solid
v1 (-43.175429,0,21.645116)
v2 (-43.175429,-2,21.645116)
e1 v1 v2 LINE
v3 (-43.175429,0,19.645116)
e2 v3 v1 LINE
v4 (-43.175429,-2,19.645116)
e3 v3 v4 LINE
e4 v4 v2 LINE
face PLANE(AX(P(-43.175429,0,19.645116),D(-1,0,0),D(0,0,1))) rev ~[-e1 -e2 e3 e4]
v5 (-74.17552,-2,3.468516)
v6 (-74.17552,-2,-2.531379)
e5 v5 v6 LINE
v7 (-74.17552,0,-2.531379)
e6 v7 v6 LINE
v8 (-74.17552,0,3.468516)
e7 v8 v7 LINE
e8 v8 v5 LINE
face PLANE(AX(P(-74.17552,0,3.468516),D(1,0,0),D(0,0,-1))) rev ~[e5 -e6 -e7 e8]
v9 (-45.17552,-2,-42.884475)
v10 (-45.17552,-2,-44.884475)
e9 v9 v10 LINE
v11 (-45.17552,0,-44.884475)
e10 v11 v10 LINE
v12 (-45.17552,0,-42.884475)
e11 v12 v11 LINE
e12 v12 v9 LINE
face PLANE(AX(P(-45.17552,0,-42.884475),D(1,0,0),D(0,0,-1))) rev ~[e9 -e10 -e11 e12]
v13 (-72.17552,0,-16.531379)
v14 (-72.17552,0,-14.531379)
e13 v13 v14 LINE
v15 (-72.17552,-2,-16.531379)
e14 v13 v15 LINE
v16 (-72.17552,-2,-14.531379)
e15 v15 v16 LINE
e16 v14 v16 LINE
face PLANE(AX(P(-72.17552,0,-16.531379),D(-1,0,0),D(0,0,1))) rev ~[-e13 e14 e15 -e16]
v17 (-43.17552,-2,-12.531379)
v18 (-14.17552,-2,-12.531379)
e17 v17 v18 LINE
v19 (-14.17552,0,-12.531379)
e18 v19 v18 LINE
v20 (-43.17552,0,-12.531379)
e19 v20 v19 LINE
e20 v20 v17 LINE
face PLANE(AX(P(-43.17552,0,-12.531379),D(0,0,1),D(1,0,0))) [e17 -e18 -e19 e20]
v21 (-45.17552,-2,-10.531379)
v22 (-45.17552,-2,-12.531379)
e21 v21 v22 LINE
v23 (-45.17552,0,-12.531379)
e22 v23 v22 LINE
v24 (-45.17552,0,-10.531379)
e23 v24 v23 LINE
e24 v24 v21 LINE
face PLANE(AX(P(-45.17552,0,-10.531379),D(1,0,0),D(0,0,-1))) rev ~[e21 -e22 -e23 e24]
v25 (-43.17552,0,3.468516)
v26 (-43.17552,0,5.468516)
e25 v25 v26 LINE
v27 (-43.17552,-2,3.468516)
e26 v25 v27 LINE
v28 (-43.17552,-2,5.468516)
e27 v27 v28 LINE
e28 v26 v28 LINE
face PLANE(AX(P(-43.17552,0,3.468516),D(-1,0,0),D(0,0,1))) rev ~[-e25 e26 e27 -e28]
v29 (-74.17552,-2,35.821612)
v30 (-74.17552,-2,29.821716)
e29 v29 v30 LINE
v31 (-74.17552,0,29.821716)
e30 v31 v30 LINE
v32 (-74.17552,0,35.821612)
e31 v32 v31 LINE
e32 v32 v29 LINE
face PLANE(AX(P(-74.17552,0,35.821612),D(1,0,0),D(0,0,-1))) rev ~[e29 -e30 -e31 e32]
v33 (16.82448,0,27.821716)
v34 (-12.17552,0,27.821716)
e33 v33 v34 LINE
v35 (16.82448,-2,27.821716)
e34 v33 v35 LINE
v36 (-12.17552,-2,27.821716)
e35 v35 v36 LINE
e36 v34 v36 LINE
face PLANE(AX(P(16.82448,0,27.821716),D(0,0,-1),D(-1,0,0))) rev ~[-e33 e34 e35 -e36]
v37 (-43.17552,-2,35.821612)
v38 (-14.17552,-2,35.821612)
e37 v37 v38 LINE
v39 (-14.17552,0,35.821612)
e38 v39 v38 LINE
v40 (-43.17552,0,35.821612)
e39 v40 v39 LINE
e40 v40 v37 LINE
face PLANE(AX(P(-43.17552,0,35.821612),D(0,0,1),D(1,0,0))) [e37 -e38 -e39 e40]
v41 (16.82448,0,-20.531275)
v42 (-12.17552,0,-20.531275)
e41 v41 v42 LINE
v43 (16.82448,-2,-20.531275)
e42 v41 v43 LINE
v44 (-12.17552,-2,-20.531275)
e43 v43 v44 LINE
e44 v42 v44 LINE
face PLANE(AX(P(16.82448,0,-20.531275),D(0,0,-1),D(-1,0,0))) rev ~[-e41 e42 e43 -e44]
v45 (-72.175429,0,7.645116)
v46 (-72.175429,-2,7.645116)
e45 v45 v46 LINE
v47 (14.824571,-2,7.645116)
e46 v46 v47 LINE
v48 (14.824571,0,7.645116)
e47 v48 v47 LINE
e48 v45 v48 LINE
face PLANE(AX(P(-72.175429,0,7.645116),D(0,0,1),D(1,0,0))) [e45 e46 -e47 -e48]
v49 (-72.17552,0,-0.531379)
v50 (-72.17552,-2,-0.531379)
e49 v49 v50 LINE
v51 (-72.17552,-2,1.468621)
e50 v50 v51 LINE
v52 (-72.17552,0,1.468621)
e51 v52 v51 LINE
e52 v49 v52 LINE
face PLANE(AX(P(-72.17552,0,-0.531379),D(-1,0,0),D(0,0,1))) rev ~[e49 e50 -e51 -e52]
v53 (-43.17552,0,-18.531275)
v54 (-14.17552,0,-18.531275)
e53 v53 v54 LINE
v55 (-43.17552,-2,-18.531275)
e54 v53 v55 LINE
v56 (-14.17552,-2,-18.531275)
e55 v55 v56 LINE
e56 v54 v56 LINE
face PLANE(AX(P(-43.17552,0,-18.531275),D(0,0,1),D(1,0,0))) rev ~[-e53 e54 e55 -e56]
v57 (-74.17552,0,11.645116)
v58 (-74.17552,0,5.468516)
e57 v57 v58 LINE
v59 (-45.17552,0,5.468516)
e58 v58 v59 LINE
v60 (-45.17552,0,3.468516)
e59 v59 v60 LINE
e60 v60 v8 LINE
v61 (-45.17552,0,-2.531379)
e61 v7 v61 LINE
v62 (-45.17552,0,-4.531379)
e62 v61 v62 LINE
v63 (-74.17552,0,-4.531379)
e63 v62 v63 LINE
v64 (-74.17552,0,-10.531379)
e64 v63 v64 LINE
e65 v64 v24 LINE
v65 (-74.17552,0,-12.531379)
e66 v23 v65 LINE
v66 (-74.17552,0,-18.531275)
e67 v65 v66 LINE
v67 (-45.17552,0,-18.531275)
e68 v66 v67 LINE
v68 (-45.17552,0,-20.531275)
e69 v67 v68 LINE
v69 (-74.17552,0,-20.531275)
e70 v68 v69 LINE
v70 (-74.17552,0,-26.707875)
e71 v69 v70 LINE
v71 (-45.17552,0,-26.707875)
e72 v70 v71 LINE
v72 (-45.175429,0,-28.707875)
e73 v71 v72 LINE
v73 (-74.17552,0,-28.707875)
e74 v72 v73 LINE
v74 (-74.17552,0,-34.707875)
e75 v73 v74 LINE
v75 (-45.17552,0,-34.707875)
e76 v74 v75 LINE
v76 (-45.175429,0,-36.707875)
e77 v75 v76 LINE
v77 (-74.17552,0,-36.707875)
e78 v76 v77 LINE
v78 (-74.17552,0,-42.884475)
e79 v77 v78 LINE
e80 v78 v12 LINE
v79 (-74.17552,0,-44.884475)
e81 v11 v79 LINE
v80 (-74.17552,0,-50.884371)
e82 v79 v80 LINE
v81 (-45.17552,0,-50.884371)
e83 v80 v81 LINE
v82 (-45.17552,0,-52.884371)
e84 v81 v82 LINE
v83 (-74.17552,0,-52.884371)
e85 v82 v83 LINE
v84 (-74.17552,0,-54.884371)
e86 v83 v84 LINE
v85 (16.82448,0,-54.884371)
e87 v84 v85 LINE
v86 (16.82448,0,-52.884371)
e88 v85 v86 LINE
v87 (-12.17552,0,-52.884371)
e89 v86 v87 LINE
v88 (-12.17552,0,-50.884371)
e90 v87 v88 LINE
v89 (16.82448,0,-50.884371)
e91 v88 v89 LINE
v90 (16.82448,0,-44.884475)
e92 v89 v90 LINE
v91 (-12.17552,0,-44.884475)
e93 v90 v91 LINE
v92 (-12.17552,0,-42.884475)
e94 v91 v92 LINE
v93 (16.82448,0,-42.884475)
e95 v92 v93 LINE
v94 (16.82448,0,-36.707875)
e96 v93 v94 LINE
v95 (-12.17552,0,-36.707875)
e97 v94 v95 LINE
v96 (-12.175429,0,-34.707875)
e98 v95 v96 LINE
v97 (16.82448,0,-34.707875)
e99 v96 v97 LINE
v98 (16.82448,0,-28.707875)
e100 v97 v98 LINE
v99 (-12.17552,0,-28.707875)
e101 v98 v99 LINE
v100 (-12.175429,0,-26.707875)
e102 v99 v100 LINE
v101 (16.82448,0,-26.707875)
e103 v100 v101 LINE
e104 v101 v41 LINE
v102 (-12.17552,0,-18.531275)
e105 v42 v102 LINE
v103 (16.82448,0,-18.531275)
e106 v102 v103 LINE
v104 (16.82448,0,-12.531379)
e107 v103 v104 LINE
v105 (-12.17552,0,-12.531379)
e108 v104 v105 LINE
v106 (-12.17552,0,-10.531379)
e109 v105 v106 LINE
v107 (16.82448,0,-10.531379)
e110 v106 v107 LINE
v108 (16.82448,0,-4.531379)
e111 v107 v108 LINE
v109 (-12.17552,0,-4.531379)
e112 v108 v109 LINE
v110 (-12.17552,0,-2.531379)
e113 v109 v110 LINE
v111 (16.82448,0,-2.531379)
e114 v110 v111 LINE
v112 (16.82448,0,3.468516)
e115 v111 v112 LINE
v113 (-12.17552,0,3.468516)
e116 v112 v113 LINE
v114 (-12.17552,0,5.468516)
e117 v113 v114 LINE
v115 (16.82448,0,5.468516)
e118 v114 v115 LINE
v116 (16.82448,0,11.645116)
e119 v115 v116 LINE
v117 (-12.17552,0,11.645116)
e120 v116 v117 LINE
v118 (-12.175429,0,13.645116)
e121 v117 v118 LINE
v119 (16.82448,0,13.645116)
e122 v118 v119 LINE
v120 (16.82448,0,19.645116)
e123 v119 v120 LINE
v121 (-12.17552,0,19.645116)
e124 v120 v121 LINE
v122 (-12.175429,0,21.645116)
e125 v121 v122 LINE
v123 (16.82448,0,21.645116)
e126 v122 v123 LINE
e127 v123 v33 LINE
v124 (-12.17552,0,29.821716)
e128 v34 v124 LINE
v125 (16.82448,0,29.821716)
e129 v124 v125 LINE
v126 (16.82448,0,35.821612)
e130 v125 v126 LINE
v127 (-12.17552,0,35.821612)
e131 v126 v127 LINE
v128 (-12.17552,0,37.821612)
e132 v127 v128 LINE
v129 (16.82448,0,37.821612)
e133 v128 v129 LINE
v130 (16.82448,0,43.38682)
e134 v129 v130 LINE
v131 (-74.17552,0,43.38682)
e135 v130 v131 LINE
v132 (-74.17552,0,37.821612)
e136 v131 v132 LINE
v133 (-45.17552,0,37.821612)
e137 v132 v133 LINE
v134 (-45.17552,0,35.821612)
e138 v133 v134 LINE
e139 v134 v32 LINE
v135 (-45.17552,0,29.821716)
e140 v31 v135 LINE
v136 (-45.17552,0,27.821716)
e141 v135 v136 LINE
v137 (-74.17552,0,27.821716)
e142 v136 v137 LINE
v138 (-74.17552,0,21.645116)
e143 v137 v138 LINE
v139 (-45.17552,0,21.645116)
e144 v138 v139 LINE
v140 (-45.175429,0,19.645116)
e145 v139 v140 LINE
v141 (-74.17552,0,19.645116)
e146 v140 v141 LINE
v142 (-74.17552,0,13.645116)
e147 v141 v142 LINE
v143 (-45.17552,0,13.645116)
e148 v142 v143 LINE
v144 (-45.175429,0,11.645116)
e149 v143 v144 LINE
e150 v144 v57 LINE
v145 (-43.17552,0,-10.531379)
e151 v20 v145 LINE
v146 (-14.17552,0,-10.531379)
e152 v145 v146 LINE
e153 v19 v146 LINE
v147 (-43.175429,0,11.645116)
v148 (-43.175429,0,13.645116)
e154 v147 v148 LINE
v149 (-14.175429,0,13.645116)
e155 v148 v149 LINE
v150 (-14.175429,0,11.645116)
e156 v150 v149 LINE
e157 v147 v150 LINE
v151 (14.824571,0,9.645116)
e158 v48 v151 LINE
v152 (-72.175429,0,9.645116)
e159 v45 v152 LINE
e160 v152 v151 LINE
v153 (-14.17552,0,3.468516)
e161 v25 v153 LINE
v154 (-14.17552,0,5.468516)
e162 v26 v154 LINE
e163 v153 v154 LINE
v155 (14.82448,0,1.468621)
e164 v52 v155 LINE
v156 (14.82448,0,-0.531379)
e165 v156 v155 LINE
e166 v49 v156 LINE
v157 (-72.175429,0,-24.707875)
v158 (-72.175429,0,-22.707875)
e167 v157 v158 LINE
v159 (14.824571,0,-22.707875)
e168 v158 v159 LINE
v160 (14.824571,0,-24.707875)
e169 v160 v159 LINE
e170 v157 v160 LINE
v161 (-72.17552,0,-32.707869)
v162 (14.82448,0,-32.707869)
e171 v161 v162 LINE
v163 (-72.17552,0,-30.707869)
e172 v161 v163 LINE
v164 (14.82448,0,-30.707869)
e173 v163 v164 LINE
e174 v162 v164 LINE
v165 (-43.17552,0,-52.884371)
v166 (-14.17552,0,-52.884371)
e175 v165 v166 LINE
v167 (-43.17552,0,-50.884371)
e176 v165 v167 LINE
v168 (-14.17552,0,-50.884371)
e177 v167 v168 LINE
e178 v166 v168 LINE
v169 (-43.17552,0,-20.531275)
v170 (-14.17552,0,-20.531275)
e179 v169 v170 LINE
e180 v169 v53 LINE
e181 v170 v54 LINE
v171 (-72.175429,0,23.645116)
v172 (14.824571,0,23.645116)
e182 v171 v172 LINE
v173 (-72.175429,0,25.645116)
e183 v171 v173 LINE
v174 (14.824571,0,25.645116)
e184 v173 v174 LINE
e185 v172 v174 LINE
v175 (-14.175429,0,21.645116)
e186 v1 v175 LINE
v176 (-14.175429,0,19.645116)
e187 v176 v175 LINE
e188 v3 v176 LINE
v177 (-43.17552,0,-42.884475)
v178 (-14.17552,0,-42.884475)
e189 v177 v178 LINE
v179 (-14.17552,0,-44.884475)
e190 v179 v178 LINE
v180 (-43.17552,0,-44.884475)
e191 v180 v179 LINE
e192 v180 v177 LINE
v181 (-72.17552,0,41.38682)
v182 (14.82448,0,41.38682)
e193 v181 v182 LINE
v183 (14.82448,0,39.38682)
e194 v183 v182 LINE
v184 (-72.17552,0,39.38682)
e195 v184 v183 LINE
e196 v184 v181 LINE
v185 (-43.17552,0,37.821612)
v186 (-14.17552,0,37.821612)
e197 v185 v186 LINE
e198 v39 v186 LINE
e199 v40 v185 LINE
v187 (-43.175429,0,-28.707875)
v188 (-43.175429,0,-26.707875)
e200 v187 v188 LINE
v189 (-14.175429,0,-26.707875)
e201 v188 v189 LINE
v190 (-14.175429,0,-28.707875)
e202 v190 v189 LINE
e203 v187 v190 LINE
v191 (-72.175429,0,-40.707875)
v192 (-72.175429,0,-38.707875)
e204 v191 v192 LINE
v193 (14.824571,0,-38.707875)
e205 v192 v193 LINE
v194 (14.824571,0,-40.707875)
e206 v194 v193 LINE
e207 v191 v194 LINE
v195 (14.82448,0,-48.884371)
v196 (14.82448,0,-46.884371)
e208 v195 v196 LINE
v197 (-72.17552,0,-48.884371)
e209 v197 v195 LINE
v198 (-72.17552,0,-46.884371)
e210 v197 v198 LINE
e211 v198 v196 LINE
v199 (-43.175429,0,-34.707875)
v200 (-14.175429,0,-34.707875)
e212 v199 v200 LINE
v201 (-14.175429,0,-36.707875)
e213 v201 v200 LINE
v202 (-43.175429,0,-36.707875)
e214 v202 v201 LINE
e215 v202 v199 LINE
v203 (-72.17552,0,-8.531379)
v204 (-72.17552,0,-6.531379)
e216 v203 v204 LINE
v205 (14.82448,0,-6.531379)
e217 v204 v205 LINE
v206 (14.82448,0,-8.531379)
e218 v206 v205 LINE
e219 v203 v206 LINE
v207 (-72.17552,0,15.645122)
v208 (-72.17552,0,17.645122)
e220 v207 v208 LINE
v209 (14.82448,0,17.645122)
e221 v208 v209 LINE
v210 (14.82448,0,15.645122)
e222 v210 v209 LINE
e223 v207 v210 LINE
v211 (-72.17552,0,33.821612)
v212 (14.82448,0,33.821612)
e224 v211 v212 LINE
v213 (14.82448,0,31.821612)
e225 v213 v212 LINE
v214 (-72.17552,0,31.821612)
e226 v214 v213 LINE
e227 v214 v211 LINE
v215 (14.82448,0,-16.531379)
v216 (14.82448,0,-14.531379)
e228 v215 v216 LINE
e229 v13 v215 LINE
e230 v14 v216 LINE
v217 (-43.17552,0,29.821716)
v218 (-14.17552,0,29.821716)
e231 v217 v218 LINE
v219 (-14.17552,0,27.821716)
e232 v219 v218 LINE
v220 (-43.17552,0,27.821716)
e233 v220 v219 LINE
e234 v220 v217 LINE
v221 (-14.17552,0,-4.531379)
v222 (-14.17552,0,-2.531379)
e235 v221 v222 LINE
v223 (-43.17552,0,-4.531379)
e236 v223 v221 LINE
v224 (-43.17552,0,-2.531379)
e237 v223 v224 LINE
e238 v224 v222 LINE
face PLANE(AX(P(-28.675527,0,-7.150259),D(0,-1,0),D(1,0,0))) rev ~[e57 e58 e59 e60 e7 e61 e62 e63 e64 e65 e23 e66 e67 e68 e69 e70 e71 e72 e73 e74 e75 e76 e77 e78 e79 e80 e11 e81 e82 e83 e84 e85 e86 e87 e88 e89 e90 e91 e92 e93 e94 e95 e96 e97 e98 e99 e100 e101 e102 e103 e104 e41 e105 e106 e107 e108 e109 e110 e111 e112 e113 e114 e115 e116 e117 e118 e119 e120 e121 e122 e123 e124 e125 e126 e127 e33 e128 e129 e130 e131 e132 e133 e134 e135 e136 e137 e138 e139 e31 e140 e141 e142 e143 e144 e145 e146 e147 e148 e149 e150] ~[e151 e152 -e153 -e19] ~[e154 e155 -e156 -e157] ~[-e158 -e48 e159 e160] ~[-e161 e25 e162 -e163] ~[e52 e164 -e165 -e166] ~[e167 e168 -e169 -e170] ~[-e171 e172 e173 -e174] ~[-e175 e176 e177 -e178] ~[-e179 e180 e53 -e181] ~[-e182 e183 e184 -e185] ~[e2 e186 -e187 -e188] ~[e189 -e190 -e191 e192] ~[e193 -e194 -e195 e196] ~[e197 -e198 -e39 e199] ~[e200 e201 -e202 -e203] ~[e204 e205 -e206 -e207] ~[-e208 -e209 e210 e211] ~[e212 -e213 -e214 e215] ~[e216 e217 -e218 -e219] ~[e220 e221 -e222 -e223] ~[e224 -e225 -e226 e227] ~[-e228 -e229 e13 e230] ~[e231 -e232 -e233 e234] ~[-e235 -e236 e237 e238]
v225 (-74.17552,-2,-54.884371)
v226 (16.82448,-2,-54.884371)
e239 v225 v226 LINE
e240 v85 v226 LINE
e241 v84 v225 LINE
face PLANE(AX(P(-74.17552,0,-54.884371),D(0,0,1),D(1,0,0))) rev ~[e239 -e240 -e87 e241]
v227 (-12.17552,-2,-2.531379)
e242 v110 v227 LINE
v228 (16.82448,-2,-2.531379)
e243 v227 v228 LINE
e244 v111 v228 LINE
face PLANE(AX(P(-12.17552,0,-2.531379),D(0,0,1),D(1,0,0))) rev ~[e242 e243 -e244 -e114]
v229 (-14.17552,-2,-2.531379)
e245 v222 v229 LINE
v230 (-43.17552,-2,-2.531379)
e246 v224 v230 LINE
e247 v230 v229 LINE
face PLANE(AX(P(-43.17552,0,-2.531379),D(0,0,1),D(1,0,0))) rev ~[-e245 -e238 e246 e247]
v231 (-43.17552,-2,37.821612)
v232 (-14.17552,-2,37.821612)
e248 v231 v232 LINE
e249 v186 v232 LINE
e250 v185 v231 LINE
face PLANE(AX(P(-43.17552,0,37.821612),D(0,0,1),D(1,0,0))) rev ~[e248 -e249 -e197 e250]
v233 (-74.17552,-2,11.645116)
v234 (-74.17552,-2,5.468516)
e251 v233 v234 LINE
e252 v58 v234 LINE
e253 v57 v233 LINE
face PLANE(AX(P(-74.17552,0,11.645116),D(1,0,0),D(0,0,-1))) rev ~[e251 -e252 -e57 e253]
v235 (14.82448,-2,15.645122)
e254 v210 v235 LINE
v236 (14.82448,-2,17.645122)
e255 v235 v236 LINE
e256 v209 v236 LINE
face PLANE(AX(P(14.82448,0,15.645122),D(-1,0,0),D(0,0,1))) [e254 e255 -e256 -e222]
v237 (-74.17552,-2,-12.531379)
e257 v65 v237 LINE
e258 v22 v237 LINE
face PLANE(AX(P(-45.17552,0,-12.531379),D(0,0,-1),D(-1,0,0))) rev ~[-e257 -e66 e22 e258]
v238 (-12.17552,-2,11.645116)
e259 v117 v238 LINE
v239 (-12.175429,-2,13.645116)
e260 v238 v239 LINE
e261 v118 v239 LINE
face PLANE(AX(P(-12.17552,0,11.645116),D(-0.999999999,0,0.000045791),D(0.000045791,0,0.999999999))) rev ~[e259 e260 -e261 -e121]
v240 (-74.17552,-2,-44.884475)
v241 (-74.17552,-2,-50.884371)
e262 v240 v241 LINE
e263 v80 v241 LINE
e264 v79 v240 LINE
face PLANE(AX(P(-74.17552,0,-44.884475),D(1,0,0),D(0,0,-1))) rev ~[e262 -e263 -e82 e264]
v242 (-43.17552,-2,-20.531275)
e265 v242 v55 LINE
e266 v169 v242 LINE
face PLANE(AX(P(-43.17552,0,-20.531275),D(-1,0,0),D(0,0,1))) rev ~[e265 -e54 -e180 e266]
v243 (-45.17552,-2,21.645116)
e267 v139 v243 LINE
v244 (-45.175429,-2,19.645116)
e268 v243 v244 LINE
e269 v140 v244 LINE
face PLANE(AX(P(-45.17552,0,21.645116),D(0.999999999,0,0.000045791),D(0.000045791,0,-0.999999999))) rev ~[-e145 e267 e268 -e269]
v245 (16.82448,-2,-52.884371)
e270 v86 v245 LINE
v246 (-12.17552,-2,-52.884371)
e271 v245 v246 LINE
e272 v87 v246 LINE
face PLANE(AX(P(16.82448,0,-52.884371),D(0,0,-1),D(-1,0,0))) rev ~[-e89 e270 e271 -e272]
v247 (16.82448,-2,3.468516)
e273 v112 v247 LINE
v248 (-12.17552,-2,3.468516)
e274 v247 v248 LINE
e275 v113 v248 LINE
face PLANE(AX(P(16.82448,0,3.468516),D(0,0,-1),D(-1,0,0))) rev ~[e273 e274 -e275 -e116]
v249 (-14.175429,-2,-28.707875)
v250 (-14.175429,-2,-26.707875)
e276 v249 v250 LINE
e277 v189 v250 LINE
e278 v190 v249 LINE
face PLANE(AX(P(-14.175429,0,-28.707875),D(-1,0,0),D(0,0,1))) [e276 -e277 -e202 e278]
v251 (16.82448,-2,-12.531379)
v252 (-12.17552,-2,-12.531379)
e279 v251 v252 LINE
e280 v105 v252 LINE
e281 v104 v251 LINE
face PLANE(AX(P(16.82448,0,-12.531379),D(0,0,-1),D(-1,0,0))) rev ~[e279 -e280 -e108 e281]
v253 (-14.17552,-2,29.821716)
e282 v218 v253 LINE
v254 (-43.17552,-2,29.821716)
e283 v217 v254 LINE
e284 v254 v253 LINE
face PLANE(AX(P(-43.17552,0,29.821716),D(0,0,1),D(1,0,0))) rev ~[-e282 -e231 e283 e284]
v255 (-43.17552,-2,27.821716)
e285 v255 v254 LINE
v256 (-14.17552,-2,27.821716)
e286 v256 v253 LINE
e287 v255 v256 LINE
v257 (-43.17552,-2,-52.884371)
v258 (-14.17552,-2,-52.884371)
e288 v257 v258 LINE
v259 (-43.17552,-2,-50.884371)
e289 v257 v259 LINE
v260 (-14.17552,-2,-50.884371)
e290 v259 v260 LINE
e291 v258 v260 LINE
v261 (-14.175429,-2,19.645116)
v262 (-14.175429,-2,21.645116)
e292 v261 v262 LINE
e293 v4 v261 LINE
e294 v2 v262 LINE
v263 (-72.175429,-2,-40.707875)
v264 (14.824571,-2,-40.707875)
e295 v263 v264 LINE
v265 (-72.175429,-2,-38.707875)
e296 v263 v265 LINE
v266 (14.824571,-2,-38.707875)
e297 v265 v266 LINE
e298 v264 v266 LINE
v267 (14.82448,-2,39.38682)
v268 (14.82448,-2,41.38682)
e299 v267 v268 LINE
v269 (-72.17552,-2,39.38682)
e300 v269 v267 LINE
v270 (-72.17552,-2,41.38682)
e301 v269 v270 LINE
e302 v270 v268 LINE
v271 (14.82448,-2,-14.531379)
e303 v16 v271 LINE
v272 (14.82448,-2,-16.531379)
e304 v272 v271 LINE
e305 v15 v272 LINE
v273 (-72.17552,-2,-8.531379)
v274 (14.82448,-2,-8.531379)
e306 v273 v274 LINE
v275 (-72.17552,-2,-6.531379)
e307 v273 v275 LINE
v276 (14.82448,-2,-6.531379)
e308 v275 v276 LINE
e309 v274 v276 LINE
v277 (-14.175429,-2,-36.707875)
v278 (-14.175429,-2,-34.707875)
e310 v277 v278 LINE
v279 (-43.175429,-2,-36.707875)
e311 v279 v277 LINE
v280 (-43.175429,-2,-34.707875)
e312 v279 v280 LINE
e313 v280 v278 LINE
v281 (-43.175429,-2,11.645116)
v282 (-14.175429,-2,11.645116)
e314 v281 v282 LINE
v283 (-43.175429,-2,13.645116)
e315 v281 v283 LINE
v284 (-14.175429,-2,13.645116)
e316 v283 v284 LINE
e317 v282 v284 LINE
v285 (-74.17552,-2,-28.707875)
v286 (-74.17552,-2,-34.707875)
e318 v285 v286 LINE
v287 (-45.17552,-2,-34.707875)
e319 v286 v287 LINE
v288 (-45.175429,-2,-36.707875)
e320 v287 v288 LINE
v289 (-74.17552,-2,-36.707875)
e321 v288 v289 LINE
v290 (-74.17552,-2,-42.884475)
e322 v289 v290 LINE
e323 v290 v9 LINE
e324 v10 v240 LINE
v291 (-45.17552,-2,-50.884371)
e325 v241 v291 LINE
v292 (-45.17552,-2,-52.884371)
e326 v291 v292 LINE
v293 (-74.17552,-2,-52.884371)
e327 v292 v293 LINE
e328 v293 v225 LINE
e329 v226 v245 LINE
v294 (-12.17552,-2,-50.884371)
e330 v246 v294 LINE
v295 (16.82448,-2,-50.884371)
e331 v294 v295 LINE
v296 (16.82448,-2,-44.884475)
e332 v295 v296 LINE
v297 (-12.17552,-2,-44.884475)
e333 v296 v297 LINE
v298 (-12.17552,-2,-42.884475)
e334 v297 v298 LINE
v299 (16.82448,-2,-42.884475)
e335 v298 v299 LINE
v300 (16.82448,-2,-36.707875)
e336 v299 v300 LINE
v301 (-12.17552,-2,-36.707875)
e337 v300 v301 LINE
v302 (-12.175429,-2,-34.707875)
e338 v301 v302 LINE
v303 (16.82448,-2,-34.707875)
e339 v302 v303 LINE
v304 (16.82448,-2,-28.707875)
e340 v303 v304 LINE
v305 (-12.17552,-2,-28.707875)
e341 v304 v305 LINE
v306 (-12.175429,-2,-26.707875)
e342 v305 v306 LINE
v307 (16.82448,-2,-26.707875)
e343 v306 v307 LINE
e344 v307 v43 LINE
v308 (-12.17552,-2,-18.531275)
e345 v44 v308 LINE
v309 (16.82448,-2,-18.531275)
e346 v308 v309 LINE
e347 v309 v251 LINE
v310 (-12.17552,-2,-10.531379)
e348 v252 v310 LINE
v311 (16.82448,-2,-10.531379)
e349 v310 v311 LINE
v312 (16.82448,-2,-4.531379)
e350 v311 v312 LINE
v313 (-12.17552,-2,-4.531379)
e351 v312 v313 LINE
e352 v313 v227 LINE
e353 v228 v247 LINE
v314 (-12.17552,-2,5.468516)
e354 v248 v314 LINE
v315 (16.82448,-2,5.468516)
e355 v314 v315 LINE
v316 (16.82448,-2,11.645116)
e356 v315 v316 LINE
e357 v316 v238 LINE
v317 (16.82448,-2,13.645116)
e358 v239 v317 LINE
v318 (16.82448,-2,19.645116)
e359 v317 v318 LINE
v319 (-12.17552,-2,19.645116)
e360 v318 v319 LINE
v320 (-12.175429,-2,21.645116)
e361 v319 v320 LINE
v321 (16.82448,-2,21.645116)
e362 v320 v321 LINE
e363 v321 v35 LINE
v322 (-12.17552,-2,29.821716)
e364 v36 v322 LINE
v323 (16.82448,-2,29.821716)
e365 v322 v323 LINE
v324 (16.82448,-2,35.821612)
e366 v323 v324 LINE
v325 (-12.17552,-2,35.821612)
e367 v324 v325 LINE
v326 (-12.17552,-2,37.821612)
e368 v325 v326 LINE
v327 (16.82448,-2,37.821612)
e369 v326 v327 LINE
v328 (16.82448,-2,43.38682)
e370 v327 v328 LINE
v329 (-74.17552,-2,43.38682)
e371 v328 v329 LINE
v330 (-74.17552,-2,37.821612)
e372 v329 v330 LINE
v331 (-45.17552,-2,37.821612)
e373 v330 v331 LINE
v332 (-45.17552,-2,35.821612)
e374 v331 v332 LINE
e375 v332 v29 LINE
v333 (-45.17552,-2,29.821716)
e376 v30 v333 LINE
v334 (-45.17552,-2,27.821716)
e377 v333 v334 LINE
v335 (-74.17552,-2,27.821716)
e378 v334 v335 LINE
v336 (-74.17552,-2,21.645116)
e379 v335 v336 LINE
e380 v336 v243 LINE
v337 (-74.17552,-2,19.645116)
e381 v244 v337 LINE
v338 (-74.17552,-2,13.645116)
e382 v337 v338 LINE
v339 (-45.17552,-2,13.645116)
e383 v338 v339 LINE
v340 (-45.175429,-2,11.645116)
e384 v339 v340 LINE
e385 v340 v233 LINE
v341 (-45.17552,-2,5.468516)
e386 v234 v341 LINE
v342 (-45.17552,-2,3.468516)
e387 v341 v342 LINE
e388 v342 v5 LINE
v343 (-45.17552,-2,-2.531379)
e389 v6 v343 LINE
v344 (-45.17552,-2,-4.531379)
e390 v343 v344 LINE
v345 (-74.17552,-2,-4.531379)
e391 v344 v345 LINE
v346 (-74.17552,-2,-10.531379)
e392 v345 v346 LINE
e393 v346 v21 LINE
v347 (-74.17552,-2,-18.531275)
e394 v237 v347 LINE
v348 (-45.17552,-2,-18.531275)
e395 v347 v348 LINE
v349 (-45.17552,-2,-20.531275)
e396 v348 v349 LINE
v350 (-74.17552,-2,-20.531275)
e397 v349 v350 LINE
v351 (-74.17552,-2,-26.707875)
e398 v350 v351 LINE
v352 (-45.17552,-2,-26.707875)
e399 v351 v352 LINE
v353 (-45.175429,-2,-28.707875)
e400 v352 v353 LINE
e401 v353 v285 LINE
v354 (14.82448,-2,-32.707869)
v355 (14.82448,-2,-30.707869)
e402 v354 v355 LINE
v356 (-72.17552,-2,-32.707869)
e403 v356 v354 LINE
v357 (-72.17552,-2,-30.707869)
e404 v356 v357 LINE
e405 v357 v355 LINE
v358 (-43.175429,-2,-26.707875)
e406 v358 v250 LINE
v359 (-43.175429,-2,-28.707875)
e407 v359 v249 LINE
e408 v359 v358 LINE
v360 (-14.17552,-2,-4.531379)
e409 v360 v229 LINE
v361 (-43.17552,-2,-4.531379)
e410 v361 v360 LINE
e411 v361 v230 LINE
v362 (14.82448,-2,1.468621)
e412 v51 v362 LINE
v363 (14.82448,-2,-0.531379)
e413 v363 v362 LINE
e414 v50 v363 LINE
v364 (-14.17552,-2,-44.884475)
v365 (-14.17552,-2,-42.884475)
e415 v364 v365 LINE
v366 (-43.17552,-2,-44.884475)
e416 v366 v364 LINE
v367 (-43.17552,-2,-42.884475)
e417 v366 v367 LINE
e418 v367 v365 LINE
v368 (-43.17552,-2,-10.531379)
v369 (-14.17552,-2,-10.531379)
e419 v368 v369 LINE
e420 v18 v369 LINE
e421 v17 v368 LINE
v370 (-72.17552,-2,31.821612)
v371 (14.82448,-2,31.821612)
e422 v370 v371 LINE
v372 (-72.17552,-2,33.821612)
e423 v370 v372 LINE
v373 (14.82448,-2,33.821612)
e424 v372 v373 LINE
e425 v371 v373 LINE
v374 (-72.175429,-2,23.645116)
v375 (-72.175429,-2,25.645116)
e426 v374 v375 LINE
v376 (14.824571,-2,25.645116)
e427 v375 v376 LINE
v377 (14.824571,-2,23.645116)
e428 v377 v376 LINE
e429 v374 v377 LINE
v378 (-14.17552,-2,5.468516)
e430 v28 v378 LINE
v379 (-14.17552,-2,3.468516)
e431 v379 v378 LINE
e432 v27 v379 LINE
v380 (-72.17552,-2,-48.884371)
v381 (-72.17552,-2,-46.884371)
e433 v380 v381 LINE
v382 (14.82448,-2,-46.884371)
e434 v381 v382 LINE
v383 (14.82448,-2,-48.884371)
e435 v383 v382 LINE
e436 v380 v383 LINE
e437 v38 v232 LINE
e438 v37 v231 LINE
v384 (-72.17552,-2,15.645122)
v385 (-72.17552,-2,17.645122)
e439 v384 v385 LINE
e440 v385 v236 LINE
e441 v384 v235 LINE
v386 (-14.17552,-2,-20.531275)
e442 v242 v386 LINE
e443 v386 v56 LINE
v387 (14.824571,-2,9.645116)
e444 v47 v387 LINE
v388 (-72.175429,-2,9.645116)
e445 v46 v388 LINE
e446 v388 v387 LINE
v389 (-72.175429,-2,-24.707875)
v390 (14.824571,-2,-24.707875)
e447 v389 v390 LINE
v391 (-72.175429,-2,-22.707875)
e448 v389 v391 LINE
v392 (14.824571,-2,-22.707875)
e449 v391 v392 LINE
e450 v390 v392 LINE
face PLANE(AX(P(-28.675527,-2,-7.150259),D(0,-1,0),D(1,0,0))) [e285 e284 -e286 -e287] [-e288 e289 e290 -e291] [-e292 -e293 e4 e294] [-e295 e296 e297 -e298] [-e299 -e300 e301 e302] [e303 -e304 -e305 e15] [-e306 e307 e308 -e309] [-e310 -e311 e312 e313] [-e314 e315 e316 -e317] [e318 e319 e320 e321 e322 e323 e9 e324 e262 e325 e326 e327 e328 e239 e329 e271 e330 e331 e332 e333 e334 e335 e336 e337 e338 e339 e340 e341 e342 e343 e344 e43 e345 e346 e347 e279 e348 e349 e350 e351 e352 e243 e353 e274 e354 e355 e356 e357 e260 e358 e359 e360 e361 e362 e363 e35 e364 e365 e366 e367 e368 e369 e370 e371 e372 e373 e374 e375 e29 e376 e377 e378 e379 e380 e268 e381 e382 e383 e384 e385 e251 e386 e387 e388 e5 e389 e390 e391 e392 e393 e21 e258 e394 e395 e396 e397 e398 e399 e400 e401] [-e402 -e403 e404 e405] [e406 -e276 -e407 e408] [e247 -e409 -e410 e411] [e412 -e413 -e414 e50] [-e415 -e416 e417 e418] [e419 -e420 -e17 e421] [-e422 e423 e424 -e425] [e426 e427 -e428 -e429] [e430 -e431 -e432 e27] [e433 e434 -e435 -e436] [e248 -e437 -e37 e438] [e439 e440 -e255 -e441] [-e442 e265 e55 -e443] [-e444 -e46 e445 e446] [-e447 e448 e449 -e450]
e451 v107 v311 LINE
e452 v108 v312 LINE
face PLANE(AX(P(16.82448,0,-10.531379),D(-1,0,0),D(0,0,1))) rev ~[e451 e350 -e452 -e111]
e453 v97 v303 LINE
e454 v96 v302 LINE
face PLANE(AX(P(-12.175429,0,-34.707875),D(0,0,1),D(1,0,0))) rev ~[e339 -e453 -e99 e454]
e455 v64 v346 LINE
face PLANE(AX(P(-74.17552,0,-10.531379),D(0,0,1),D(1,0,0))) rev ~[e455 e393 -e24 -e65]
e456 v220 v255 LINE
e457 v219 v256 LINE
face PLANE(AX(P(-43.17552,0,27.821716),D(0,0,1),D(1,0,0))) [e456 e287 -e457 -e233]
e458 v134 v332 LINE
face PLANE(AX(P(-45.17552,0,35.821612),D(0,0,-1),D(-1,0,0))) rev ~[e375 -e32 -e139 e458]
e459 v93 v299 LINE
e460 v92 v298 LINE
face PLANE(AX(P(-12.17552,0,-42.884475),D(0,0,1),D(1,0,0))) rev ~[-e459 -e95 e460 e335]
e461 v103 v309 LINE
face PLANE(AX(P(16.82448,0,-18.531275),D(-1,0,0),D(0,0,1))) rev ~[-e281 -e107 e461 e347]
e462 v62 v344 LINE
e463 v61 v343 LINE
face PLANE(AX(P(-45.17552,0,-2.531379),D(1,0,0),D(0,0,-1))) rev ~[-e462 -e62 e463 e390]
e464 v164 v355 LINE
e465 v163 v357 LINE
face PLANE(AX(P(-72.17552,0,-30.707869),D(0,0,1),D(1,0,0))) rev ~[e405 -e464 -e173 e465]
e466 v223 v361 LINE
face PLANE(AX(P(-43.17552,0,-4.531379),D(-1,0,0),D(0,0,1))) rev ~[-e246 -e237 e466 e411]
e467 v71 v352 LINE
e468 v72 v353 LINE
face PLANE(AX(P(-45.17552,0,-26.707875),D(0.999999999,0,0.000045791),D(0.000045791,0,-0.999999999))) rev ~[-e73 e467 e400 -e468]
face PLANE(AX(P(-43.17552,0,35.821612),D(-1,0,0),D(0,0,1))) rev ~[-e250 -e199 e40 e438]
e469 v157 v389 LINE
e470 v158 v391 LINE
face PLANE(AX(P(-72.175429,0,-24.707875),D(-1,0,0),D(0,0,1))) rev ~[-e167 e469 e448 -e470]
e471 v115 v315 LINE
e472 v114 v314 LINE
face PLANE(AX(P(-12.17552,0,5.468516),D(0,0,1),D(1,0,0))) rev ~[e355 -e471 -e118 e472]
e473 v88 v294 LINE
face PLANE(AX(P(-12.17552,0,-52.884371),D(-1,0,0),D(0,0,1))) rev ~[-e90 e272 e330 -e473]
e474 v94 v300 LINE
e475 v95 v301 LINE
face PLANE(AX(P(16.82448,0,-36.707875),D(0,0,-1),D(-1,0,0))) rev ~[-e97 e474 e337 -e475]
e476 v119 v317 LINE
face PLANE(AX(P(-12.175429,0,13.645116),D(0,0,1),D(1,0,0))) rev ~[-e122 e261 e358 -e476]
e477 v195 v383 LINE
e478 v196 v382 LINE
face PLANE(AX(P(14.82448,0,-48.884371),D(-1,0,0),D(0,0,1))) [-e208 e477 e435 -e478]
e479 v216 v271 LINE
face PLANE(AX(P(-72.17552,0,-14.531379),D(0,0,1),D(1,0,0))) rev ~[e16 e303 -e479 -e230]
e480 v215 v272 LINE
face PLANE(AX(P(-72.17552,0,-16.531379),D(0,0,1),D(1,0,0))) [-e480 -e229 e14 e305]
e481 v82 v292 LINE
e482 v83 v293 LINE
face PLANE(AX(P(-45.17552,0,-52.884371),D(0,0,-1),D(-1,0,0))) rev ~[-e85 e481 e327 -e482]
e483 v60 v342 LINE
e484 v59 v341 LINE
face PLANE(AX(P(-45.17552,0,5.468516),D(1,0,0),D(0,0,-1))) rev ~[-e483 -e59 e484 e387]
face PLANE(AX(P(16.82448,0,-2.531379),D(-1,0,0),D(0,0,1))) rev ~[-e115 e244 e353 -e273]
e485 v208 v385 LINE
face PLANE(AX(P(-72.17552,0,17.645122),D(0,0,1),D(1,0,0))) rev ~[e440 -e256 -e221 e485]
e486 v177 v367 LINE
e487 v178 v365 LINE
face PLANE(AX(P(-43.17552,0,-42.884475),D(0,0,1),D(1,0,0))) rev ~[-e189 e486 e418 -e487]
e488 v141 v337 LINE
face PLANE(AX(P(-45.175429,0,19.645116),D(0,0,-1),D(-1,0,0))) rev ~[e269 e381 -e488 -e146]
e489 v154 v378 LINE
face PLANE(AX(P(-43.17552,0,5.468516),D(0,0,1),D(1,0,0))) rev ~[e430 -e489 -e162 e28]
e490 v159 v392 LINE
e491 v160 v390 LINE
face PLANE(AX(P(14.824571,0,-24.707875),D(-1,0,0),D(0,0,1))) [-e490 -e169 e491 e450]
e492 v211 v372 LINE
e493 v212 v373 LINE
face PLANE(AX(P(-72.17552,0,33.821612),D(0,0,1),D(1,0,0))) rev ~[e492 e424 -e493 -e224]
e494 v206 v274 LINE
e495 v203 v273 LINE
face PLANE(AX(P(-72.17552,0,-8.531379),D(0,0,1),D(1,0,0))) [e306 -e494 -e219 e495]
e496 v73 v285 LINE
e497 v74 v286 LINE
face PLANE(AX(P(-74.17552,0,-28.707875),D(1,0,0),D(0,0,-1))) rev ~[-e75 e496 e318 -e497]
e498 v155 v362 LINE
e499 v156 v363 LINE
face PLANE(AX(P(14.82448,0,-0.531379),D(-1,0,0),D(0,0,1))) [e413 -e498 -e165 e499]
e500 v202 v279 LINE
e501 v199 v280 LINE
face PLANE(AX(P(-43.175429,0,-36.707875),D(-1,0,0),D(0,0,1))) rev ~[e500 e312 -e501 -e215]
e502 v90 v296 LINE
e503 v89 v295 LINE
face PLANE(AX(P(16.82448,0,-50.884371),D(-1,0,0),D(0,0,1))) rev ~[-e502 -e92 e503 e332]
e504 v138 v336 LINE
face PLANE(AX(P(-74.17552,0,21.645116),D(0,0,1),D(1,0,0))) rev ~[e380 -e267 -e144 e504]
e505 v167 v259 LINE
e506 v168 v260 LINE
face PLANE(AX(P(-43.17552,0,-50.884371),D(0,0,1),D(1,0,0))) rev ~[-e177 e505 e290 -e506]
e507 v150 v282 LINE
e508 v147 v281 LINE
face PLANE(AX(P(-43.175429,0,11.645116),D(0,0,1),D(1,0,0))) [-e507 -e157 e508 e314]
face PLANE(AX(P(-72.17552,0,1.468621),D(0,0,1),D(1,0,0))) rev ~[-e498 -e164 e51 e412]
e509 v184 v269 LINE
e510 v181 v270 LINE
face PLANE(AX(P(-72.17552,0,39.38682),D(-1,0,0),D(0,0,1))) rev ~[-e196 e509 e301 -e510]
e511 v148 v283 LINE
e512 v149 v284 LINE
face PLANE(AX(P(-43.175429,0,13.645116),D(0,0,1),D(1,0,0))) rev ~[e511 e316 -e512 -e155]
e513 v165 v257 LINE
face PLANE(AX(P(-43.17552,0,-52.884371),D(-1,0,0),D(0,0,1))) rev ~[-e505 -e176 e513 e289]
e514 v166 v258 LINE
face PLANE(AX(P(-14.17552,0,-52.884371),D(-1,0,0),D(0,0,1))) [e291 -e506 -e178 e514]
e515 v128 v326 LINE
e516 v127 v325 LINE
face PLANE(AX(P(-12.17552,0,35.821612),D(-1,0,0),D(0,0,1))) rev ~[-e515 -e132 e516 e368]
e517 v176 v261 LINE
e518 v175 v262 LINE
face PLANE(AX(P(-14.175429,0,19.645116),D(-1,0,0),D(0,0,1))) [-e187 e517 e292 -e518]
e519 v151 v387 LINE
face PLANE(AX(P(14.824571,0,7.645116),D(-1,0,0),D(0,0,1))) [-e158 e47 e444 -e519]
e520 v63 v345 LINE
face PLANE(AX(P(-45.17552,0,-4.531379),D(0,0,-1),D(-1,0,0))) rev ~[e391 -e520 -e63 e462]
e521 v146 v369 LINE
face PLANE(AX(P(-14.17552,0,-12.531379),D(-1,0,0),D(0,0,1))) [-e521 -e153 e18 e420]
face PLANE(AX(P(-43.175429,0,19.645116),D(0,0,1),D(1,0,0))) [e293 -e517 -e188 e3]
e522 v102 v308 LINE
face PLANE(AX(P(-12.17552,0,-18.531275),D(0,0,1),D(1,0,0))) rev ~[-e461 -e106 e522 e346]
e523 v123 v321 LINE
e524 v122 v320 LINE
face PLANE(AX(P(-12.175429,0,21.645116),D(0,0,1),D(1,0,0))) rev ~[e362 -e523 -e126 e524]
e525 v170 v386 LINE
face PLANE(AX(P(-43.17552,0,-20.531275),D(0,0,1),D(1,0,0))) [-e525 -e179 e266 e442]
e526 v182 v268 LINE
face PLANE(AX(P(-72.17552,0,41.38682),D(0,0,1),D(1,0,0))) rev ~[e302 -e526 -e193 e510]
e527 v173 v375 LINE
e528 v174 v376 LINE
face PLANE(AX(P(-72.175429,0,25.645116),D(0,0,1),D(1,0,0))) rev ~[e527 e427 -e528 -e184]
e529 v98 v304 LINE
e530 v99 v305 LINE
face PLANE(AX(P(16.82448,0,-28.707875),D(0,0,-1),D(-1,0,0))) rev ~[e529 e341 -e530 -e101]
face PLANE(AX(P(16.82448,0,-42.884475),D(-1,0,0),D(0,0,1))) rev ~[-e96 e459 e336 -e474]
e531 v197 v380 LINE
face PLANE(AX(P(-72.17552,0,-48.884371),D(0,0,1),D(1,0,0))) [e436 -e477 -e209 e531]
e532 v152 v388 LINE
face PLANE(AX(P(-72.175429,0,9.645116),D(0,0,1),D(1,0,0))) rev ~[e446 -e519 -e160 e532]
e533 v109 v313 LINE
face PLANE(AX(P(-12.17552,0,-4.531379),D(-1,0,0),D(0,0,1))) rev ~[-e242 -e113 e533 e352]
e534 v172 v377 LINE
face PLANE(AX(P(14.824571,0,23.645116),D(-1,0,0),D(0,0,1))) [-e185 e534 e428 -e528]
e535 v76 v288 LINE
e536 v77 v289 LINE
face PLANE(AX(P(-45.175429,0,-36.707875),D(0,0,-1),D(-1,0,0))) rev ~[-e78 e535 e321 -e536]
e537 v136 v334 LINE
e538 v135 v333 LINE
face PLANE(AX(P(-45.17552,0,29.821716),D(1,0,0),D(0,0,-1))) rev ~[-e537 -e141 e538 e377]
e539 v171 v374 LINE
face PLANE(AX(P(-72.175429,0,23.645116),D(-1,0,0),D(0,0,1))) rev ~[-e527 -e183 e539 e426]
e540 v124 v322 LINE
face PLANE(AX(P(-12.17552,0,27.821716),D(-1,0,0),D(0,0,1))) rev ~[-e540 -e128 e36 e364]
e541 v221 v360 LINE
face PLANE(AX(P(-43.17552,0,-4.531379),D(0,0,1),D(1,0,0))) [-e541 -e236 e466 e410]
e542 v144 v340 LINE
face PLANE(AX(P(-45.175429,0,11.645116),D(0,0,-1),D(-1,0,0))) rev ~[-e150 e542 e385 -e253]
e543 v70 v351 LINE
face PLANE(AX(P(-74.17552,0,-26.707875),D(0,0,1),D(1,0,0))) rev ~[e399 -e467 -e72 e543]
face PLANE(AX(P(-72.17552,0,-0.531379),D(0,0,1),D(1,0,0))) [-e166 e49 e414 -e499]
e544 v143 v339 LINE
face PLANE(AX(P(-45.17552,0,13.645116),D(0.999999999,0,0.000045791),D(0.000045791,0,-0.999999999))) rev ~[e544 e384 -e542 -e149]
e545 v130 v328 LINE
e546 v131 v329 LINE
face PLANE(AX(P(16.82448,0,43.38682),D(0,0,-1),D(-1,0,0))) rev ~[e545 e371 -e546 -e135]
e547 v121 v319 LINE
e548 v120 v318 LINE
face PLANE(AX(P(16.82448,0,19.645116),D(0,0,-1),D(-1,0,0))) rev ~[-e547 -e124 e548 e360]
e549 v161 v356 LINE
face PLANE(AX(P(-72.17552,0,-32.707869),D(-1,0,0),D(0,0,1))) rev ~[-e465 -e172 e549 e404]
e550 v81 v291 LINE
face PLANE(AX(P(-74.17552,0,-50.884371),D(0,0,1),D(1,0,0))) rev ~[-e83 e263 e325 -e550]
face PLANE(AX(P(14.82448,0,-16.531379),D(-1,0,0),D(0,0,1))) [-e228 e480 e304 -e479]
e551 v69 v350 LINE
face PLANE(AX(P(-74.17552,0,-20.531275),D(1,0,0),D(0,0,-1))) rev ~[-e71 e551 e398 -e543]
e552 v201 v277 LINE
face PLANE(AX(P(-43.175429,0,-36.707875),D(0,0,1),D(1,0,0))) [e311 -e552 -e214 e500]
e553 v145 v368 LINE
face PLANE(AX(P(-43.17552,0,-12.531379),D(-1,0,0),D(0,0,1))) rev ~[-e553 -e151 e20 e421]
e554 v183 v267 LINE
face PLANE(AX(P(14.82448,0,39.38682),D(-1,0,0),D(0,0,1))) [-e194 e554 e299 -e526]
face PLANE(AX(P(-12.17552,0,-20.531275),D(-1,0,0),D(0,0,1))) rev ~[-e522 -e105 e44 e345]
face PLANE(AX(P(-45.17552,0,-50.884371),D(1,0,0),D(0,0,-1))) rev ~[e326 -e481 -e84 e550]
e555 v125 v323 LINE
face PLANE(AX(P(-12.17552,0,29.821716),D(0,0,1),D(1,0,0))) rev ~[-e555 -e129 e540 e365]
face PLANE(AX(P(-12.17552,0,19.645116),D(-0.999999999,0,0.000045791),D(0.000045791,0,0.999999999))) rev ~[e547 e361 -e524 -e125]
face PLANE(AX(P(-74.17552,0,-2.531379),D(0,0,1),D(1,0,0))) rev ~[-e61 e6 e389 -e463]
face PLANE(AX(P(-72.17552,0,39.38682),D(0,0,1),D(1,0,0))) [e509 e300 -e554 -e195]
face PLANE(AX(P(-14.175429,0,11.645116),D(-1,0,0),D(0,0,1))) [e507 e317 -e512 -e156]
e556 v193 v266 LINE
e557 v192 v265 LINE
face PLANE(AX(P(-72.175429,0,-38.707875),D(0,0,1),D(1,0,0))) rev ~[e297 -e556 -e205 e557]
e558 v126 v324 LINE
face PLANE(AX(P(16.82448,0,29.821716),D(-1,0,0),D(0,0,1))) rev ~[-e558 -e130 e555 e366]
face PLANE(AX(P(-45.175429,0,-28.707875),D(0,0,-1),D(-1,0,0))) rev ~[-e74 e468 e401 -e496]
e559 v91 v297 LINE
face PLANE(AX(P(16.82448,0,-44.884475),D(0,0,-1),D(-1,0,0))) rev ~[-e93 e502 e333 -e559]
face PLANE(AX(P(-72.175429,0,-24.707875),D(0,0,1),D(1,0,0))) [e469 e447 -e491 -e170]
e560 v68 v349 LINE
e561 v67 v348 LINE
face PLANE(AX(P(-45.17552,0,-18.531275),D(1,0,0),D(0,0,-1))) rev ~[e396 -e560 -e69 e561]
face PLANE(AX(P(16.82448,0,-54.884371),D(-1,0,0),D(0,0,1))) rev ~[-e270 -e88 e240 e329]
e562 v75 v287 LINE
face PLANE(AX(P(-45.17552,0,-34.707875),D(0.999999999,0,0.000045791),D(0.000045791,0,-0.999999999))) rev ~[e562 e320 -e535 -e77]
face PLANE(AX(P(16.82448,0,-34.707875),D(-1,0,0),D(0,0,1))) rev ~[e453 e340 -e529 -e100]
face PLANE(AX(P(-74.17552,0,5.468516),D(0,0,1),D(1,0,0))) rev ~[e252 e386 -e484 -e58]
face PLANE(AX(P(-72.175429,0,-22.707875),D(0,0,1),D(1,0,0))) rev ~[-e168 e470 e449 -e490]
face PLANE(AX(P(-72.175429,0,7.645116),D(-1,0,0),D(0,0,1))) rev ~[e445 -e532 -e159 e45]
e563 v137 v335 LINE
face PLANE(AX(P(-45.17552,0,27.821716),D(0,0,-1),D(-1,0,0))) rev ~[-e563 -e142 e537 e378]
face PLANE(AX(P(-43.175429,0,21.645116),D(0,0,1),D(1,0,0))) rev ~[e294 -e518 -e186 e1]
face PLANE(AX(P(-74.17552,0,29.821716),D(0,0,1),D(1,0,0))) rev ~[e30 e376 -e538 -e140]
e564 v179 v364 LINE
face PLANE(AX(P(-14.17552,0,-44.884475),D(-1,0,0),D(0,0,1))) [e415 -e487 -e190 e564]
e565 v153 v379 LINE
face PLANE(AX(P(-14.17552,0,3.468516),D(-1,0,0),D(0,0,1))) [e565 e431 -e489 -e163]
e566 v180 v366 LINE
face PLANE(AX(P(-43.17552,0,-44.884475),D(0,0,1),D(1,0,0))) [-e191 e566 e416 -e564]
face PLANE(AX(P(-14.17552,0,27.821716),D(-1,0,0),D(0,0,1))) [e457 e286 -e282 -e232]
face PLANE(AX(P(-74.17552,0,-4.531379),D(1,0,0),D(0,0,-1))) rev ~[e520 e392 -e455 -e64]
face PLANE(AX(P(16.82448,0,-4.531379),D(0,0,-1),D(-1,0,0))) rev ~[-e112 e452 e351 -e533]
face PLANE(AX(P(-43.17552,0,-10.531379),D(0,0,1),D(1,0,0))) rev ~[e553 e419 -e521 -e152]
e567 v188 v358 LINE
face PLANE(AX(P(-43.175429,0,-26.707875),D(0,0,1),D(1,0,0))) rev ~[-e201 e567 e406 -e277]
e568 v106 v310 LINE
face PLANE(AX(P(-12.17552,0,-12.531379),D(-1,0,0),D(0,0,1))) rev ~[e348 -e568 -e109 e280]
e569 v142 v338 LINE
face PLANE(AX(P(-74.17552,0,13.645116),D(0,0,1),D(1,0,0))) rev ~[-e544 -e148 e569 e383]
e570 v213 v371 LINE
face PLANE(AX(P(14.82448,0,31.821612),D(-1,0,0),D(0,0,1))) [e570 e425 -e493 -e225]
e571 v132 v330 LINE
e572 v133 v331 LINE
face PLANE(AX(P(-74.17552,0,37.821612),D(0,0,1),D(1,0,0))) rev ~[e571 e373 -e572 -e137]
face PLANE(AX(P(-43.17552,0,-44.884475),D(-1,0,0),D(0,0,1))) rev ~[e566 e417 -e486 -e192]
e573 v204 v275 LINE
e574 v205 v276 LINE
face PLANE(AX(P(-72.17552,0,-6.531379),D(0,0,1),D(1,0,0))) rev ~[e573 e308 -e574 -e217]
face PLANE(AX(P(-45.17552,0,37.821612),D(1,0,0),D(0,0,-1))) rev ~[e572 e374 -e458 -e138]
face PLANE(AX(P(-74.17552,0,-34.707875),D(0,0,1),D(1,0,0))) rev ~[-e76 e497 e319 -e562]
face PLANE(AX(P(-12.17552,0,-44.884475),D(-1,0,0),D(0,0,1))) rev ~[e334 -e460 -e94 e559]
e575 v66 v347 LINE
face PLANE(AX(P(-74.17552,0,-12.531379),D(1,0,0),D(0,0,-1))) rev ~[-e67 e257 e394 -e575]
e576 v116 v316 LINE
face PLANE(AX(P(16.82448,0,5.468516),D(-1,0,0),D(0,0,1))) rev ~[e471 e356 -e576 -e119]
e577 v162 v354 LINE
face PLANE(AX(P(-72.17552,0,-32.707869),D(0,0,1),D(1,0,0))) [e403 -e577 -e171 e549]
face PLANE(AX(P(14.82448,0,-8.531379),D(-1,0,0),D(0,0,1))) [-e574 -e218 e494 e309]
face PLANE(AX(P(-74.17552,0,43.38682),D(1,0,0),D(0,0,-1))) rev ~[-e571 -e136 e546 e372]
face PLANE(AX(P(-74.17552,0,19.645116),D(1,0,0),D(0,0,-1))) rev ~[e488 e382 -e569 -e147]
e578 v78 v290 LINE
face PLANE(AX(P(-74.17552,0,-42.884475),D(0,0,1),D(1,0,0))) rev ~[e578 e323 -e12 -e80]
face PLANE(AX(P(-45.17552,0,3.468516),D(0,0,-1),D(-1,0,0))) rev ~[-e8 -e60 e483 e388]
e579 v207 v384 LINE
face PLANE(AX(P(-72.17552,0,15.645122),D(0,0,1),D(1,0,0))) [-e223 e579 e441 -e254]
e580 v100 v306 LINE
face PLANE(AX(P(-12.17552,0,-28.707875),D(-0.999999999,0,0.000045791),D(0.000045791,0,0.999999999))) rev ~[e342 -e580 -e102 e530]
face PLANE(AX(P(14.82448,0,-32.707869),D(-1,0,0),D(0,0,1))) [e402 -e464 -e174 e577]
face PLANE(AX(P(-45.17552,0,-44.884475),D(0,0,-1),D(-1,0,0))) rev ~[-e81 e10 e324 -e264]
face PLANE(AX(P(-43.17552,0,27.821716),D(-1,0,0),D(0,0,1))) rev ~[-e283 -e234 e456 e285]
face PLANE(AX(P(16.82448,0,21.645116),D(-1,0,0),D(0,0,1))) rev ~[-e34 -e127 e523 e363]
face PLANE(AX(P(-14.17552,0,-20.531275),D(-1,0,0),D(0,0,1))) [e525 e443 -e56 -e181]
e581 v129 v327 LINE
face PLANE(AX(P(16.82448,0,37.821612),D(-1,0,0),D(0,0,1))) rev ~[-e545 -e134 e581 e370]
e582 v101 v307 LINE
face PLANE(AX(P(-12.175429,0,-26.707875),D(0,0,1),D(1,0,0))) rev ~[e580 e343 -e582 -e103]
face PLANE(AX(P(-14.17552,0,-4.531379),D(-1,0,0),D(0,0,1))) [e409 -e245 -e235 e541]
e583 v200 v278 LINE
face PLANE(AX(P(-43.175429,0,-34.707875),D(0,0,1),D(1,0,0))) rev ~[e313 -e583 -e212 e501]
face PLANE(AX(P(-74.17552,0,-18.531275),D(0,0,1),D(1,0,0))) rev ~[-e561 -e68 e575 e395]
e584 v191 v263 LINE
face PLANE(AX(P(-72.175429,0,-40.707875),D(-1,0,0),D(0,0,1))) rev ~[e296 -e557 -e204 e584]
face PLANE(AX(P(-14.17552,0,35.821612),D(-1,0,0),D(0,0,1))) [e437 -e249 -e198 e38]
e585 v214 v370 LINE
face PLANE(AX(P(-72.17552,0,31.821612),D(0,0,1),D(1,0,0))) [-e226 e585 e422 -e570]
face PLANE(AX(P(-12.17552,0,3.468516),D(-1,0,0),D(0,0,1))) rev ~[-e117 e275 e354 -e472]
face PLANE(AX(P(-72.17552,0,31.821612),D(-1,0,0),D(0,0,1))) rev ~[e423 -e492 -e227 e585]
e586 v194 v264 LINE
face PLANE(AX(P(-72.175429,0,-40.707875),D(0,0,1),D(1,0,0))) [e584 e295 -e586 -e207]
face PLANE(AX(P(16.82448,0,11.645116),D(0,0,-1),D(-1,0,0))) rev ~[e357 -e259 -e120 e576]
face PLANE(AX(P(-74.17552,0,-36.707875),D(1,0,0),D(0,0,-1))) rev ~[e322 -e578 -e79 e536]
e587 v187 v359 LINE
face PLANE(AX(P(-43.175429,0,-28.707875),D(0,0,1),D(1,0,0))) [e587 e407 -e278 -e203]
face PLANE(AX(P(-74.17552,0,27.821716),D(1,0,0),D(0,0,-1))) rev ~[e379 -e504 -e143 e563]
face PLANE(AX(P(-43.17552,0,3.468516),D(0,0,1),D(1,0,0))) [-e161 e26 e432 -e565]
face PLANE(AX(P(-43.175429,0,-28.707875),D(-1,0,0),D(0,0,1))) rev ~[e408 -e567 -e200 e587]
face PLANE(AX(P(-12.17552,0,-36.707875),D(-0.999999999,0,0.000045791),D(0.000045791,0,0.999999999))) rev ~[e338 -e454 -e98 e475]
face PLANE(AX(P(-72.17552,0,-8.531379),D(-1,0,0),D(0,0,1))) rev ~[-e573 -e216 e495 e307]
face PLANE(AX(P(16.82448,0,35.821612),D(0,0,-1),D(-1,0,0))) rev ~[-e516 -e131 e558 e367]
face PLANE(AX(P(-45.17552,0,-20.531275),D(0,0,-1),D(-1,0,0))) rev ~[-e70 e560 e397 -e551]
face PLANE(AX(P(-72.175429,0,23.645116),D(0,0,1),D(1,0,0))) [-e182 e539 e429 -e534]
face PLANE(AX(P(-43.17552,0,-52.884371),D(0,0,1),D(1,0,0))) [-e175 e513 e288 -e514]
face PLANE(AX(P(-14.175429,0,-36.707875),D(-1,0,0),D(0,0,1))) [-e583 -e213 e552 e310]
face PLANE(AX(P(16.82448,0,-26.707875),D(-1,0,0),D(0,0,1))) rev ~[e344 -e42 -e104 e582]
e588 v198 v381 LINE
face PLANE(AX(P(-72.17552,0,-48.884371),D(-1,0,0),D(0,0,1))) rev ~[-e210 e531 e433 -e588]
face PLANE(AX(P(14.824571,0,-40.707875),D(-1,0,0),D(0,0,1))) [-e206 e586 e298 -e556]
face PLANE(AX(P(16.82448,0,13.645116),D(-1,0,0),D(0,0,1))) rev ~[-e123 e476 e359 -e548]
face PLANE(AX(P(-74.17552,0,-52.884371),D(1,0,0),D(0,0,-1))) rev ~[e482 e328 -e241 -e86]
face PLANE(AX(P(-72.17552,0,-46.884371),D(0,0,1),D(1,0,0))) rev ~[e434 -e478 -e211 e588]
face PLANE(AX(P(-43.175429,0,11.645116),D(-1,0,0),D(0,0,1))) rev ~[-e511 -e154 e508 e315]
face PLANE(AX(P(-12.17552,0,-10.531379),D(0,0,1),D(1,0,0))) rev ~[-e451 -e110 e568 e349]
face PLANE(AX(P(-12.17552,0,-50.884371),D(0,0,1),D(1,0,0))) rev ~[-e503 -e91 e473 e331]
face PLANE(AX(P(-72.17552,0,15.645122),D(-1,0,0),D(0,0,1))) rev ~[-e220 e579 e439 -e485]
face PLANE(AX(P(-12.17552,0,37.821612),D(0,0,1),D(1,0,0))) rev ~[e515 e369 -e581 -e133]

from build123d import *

# Parameters (mm, degrees)
F0_W     = 87
F0_H     = 2
F0_W_2   = 29
F1_DEPTH = 2


# Not quite as in the source:
# - ends of sketch curves that miss each other by under 0.0002 mm in the source are joined


with BuildPart() as f1:
    # F0 (on Front) → F1 (new body)
    with BuildSketch(Plane.XZ):
        Polygon((-74.1755201817, -53.7046223087), (-74.1755201817, -54.8843706005), (16.8244798183, -54.8843706005), (16.8244798183, -52.8843706005), (-12.1755201817, -52.8843706005), (-12.1755201817, -50.8843706005), (16.8244798183, -50.8843706005), (16.8244798183, -44.8844749875), (-12.1755201817, -44.8844749875), (-12.1755201817, -42.8844749875), (16.8244798183, -42.8844749875), (16.8244798183, -36.7078750432), (-12.1755201817, -36.7078750432), (-12.1754285991, -34.7078750432), (16.8244798183, -34.7078750432), (16.8244798183, -28.7078750432), (-12.1755201817, -28.7078750432), (-12.1754285991, -26.7078750432), (16.8244798183, -26.7078750432), (16.8244798183, -20.5312750988), (-12.1755201817, -20.5312750988), (-12.1755201817, -18.5312750988), (16.8244798183, -18.5312750988), (16.8244798183, -12.5313794858), (-12.1755201817, -12.5313794858), (-12.1755201817, -10.5313794858), (16.8244798183, -10.5313794858), (16.8244798183, -4.5313794858), (-12.1755201817, -4.5313794858), (-12.1755201817, -2.5313794858), (16.8244798183, -2.5313794858), (16.8244798183, 3.4685161272), (-12.1755201817, 3.4685161272), (-12.1755201817, 5.4685161272), (16.8244798183, 5.4685161272), (16.8244798183, 11.6451160715), (-12.1755201817, 11.6451160715), (-12.1754285991, 13.6451160715), (16.8244798183, 13.6451160715), (16.8244798183, 19.6451160715), (-12.1755201817, 19.6451160715), (-12.1754285991, 21.6451160715), (16.8244798183, 21.6451160715), (16.8244798183, 27.8217160159), (-12.1755201817, 27.8217160159), (-12.1755201817, 29.8217160159), (16.8244798183, 29.8217160159), (16.8244798183, 35.8216116289), (-12.1755201817, 35.8216116289), (-12.1755201817, 37.8216116289), (16.8244798183, 37.8216116289), (16.8244798183, 43.3868200481), (-74.1755201817, 43.3868200481), (-74.1755201817, 37.8216116289), (-45.1755201817, 37.8216116289), (-45.1755201817, 35.8216116289), (-74.1755201817, 35.8216116289), (-74.1755201817, 29.8217160159), (-45.1755201817, 29.8217160159), (-45.1755201817, 27.8217160159), (-74.1755201817, 27.8217160159), (-74.1755201817, 21.6451160715), (-45.1755201817, 21.6451160715), (-45.1754285991, 19.6451160715), (-74.1755201817, 19.6451160715), (-74.1755201817, 13.6451160715), (-45.1755201817, 13.6451160715), (-45.1754285991, 11.6451160715), (-74.1755201817, 11.6451160715), (-74.1755201817, 5.4685161272), (-45.1755201817, 5.4685161272), (-45.1755201817, 3.4685161272), (-74.1755201817, 3.4685161272), (-74.1755201817, -2.5313794858), (-45.1755201817, -2.5313794858), (-45.1755201817, -4.5313794858), (-74.1755201817, -4.5313794858), (-74.1755201817, -10.5313794858), (-45.1755201817, -10.5313794858), (-45.1755201817, -12.5313794858), (-74.1755201817, -12.5313794858), (-74.1755201817, -18.5312750988), (-45.1755201817, -18.5312750988), (-45.1755201817, -20.5312750988), (-74.1755201817, -20.5312750988), (-74.1755201817, -26.7078750432), (-45.1755201817, -26.7078750432), (-45.1754285991, -28.7078750432), (-74.1755201817, -28.7078750432), (-74.1755201817, -34.7078750432), (-45.1755201817, -34.7078750432), (-45.1754285991, -36.7078750432), (-74.1755201817, -36.7078750432), (-74.1755201817, -42.8844749875), (-45.1755201817, -42.8844749875), (-45.1755201817, -44.8844749875), (-74.1755201817, -44.8844749875), (-74.1755201817, -50.8843706005), (-45.1755201817, -50.8843706005), (-45.1755201817, -52.8843706005), (-74.1755201817, -52.8843706005), align=None)
        with Locations((-28.6755201817, -47.8843706005)):
            Rectangle(F0_W, F0_H, mode=Mode.SUBTRACT)
        with Locations((-28.6755201817, -43.8844749875)):
            Rectangle(F0_W_2, F0_H, mode=Mode.SUBTRACT)
        with Locations((-28.6755201817, -31.7078686953)):
            Rectangle(F0_W, F0_H, mode=Mode.SUBTRACT)
        with Locations((-28.6755201817, -19.5312750988)):
            Rectangle(F0_W_2, F0_H, mode=Mode.SUBTRACT)
        with Locations((-28.6755201817, -15.5313794858)):
            Rectangle(F0_W, F0_H, mode=Mode.SUBTRACT)
        with Locations((-28.6755201817, -51.8843706005)):
            Rectangle(F0_W_2, F0_H, mode=Mode.SUBTRACT)
        with Locations((-28.6754285991, -39.7078750432)):
            Rectangle(F0_W, F0_H, mode=Mode.SUBTRACT)
        with Locations((-28.6754285991, -35.7078750432)):
            Rectangle(F0_W_2, F0_H, mode=Mode.SUBTRACT)
        with Locations((-28.6754285991, -27.7078750432)):
            Rectangle(F0_W_2, F0_H, mode=Mode.SUBTRACT)
        with Locations((-28.6754285991, -23.7078750432)):
            Rectangle(F0_W, F0_H, mode=Mode.SUBTRACT)
        with Locations((-28.6755201817, -11.5313794858)):
            Rectangle(F0_W_2, F0_H, mode=Mode.SUBTRACT)
        with Locations((-28.6755201817, -7.5313794858)):
            Rectangle(F0_W, F0_H, mode=Mode.SUBTRACT)
        with Locations((-28.6755201817, 0.4686205142)):
            Rectangle(F0_W, F0_H, mode=Mode.SUBTRACT)
        with Locations((-28.6755201817, 4.4685161272)):
            Rectangle(F0_W_2, F0_H, mode=Mode.SUBTRACT)
        with Locations((-28.6755201817, 16.6451224194)):
            Rectangle(F0_W, F0_H, mode=Mode.SUBTRACT)
        with Locations((-28.6755201817, 28.8217160159)):
            Rectangle(F0_W_2, F0_H, mode=Mode.SUBTRACT)
        with Locations((-28.6755201817, 32.8216116289)):
            Rectangle(F0_W, F0_H, mode=Mode.SUBTRACT)
        with Locations((-28.6755201817, 40.3868200481)):
            Rectangle(F0_W, F0_H, mode=Mode.SUBTRACT)
        with Locations((-28.6755201817, -3.5313794858)):
            Rectangle(F0_W_2, F0_H, mode=Mode.SUBTRACT)
        with Locations((-28.6754285991, 8.6451160715)):
            Rectangle(F0_W, F0_H, mode=Mode.SUBTRACT)
        with Locations((-28.6754285991, 12.6451160715)):
            Rectangle(F0_W_2, F0_H, mode=Mode.SUBTRACT)
        with Locations((-28.6754285991, 20.6451160715)):
            Rectangle(F0_W_2, F0_H, mode=Mode.SUBTRACT)
        with Locations((-28.6754285991, 24.6451160715)):
            Rectangle(F0_W, F0_H, mode=Mode.SUBTRACT)
        with Locations((-28.6755201817, 36.8216116289)):
            Rectangle(F0_W_2, F0_H, mode=Mode.SUBTRACT)
    extrude(amount=F1_DEPTH)


solid = f1.part
